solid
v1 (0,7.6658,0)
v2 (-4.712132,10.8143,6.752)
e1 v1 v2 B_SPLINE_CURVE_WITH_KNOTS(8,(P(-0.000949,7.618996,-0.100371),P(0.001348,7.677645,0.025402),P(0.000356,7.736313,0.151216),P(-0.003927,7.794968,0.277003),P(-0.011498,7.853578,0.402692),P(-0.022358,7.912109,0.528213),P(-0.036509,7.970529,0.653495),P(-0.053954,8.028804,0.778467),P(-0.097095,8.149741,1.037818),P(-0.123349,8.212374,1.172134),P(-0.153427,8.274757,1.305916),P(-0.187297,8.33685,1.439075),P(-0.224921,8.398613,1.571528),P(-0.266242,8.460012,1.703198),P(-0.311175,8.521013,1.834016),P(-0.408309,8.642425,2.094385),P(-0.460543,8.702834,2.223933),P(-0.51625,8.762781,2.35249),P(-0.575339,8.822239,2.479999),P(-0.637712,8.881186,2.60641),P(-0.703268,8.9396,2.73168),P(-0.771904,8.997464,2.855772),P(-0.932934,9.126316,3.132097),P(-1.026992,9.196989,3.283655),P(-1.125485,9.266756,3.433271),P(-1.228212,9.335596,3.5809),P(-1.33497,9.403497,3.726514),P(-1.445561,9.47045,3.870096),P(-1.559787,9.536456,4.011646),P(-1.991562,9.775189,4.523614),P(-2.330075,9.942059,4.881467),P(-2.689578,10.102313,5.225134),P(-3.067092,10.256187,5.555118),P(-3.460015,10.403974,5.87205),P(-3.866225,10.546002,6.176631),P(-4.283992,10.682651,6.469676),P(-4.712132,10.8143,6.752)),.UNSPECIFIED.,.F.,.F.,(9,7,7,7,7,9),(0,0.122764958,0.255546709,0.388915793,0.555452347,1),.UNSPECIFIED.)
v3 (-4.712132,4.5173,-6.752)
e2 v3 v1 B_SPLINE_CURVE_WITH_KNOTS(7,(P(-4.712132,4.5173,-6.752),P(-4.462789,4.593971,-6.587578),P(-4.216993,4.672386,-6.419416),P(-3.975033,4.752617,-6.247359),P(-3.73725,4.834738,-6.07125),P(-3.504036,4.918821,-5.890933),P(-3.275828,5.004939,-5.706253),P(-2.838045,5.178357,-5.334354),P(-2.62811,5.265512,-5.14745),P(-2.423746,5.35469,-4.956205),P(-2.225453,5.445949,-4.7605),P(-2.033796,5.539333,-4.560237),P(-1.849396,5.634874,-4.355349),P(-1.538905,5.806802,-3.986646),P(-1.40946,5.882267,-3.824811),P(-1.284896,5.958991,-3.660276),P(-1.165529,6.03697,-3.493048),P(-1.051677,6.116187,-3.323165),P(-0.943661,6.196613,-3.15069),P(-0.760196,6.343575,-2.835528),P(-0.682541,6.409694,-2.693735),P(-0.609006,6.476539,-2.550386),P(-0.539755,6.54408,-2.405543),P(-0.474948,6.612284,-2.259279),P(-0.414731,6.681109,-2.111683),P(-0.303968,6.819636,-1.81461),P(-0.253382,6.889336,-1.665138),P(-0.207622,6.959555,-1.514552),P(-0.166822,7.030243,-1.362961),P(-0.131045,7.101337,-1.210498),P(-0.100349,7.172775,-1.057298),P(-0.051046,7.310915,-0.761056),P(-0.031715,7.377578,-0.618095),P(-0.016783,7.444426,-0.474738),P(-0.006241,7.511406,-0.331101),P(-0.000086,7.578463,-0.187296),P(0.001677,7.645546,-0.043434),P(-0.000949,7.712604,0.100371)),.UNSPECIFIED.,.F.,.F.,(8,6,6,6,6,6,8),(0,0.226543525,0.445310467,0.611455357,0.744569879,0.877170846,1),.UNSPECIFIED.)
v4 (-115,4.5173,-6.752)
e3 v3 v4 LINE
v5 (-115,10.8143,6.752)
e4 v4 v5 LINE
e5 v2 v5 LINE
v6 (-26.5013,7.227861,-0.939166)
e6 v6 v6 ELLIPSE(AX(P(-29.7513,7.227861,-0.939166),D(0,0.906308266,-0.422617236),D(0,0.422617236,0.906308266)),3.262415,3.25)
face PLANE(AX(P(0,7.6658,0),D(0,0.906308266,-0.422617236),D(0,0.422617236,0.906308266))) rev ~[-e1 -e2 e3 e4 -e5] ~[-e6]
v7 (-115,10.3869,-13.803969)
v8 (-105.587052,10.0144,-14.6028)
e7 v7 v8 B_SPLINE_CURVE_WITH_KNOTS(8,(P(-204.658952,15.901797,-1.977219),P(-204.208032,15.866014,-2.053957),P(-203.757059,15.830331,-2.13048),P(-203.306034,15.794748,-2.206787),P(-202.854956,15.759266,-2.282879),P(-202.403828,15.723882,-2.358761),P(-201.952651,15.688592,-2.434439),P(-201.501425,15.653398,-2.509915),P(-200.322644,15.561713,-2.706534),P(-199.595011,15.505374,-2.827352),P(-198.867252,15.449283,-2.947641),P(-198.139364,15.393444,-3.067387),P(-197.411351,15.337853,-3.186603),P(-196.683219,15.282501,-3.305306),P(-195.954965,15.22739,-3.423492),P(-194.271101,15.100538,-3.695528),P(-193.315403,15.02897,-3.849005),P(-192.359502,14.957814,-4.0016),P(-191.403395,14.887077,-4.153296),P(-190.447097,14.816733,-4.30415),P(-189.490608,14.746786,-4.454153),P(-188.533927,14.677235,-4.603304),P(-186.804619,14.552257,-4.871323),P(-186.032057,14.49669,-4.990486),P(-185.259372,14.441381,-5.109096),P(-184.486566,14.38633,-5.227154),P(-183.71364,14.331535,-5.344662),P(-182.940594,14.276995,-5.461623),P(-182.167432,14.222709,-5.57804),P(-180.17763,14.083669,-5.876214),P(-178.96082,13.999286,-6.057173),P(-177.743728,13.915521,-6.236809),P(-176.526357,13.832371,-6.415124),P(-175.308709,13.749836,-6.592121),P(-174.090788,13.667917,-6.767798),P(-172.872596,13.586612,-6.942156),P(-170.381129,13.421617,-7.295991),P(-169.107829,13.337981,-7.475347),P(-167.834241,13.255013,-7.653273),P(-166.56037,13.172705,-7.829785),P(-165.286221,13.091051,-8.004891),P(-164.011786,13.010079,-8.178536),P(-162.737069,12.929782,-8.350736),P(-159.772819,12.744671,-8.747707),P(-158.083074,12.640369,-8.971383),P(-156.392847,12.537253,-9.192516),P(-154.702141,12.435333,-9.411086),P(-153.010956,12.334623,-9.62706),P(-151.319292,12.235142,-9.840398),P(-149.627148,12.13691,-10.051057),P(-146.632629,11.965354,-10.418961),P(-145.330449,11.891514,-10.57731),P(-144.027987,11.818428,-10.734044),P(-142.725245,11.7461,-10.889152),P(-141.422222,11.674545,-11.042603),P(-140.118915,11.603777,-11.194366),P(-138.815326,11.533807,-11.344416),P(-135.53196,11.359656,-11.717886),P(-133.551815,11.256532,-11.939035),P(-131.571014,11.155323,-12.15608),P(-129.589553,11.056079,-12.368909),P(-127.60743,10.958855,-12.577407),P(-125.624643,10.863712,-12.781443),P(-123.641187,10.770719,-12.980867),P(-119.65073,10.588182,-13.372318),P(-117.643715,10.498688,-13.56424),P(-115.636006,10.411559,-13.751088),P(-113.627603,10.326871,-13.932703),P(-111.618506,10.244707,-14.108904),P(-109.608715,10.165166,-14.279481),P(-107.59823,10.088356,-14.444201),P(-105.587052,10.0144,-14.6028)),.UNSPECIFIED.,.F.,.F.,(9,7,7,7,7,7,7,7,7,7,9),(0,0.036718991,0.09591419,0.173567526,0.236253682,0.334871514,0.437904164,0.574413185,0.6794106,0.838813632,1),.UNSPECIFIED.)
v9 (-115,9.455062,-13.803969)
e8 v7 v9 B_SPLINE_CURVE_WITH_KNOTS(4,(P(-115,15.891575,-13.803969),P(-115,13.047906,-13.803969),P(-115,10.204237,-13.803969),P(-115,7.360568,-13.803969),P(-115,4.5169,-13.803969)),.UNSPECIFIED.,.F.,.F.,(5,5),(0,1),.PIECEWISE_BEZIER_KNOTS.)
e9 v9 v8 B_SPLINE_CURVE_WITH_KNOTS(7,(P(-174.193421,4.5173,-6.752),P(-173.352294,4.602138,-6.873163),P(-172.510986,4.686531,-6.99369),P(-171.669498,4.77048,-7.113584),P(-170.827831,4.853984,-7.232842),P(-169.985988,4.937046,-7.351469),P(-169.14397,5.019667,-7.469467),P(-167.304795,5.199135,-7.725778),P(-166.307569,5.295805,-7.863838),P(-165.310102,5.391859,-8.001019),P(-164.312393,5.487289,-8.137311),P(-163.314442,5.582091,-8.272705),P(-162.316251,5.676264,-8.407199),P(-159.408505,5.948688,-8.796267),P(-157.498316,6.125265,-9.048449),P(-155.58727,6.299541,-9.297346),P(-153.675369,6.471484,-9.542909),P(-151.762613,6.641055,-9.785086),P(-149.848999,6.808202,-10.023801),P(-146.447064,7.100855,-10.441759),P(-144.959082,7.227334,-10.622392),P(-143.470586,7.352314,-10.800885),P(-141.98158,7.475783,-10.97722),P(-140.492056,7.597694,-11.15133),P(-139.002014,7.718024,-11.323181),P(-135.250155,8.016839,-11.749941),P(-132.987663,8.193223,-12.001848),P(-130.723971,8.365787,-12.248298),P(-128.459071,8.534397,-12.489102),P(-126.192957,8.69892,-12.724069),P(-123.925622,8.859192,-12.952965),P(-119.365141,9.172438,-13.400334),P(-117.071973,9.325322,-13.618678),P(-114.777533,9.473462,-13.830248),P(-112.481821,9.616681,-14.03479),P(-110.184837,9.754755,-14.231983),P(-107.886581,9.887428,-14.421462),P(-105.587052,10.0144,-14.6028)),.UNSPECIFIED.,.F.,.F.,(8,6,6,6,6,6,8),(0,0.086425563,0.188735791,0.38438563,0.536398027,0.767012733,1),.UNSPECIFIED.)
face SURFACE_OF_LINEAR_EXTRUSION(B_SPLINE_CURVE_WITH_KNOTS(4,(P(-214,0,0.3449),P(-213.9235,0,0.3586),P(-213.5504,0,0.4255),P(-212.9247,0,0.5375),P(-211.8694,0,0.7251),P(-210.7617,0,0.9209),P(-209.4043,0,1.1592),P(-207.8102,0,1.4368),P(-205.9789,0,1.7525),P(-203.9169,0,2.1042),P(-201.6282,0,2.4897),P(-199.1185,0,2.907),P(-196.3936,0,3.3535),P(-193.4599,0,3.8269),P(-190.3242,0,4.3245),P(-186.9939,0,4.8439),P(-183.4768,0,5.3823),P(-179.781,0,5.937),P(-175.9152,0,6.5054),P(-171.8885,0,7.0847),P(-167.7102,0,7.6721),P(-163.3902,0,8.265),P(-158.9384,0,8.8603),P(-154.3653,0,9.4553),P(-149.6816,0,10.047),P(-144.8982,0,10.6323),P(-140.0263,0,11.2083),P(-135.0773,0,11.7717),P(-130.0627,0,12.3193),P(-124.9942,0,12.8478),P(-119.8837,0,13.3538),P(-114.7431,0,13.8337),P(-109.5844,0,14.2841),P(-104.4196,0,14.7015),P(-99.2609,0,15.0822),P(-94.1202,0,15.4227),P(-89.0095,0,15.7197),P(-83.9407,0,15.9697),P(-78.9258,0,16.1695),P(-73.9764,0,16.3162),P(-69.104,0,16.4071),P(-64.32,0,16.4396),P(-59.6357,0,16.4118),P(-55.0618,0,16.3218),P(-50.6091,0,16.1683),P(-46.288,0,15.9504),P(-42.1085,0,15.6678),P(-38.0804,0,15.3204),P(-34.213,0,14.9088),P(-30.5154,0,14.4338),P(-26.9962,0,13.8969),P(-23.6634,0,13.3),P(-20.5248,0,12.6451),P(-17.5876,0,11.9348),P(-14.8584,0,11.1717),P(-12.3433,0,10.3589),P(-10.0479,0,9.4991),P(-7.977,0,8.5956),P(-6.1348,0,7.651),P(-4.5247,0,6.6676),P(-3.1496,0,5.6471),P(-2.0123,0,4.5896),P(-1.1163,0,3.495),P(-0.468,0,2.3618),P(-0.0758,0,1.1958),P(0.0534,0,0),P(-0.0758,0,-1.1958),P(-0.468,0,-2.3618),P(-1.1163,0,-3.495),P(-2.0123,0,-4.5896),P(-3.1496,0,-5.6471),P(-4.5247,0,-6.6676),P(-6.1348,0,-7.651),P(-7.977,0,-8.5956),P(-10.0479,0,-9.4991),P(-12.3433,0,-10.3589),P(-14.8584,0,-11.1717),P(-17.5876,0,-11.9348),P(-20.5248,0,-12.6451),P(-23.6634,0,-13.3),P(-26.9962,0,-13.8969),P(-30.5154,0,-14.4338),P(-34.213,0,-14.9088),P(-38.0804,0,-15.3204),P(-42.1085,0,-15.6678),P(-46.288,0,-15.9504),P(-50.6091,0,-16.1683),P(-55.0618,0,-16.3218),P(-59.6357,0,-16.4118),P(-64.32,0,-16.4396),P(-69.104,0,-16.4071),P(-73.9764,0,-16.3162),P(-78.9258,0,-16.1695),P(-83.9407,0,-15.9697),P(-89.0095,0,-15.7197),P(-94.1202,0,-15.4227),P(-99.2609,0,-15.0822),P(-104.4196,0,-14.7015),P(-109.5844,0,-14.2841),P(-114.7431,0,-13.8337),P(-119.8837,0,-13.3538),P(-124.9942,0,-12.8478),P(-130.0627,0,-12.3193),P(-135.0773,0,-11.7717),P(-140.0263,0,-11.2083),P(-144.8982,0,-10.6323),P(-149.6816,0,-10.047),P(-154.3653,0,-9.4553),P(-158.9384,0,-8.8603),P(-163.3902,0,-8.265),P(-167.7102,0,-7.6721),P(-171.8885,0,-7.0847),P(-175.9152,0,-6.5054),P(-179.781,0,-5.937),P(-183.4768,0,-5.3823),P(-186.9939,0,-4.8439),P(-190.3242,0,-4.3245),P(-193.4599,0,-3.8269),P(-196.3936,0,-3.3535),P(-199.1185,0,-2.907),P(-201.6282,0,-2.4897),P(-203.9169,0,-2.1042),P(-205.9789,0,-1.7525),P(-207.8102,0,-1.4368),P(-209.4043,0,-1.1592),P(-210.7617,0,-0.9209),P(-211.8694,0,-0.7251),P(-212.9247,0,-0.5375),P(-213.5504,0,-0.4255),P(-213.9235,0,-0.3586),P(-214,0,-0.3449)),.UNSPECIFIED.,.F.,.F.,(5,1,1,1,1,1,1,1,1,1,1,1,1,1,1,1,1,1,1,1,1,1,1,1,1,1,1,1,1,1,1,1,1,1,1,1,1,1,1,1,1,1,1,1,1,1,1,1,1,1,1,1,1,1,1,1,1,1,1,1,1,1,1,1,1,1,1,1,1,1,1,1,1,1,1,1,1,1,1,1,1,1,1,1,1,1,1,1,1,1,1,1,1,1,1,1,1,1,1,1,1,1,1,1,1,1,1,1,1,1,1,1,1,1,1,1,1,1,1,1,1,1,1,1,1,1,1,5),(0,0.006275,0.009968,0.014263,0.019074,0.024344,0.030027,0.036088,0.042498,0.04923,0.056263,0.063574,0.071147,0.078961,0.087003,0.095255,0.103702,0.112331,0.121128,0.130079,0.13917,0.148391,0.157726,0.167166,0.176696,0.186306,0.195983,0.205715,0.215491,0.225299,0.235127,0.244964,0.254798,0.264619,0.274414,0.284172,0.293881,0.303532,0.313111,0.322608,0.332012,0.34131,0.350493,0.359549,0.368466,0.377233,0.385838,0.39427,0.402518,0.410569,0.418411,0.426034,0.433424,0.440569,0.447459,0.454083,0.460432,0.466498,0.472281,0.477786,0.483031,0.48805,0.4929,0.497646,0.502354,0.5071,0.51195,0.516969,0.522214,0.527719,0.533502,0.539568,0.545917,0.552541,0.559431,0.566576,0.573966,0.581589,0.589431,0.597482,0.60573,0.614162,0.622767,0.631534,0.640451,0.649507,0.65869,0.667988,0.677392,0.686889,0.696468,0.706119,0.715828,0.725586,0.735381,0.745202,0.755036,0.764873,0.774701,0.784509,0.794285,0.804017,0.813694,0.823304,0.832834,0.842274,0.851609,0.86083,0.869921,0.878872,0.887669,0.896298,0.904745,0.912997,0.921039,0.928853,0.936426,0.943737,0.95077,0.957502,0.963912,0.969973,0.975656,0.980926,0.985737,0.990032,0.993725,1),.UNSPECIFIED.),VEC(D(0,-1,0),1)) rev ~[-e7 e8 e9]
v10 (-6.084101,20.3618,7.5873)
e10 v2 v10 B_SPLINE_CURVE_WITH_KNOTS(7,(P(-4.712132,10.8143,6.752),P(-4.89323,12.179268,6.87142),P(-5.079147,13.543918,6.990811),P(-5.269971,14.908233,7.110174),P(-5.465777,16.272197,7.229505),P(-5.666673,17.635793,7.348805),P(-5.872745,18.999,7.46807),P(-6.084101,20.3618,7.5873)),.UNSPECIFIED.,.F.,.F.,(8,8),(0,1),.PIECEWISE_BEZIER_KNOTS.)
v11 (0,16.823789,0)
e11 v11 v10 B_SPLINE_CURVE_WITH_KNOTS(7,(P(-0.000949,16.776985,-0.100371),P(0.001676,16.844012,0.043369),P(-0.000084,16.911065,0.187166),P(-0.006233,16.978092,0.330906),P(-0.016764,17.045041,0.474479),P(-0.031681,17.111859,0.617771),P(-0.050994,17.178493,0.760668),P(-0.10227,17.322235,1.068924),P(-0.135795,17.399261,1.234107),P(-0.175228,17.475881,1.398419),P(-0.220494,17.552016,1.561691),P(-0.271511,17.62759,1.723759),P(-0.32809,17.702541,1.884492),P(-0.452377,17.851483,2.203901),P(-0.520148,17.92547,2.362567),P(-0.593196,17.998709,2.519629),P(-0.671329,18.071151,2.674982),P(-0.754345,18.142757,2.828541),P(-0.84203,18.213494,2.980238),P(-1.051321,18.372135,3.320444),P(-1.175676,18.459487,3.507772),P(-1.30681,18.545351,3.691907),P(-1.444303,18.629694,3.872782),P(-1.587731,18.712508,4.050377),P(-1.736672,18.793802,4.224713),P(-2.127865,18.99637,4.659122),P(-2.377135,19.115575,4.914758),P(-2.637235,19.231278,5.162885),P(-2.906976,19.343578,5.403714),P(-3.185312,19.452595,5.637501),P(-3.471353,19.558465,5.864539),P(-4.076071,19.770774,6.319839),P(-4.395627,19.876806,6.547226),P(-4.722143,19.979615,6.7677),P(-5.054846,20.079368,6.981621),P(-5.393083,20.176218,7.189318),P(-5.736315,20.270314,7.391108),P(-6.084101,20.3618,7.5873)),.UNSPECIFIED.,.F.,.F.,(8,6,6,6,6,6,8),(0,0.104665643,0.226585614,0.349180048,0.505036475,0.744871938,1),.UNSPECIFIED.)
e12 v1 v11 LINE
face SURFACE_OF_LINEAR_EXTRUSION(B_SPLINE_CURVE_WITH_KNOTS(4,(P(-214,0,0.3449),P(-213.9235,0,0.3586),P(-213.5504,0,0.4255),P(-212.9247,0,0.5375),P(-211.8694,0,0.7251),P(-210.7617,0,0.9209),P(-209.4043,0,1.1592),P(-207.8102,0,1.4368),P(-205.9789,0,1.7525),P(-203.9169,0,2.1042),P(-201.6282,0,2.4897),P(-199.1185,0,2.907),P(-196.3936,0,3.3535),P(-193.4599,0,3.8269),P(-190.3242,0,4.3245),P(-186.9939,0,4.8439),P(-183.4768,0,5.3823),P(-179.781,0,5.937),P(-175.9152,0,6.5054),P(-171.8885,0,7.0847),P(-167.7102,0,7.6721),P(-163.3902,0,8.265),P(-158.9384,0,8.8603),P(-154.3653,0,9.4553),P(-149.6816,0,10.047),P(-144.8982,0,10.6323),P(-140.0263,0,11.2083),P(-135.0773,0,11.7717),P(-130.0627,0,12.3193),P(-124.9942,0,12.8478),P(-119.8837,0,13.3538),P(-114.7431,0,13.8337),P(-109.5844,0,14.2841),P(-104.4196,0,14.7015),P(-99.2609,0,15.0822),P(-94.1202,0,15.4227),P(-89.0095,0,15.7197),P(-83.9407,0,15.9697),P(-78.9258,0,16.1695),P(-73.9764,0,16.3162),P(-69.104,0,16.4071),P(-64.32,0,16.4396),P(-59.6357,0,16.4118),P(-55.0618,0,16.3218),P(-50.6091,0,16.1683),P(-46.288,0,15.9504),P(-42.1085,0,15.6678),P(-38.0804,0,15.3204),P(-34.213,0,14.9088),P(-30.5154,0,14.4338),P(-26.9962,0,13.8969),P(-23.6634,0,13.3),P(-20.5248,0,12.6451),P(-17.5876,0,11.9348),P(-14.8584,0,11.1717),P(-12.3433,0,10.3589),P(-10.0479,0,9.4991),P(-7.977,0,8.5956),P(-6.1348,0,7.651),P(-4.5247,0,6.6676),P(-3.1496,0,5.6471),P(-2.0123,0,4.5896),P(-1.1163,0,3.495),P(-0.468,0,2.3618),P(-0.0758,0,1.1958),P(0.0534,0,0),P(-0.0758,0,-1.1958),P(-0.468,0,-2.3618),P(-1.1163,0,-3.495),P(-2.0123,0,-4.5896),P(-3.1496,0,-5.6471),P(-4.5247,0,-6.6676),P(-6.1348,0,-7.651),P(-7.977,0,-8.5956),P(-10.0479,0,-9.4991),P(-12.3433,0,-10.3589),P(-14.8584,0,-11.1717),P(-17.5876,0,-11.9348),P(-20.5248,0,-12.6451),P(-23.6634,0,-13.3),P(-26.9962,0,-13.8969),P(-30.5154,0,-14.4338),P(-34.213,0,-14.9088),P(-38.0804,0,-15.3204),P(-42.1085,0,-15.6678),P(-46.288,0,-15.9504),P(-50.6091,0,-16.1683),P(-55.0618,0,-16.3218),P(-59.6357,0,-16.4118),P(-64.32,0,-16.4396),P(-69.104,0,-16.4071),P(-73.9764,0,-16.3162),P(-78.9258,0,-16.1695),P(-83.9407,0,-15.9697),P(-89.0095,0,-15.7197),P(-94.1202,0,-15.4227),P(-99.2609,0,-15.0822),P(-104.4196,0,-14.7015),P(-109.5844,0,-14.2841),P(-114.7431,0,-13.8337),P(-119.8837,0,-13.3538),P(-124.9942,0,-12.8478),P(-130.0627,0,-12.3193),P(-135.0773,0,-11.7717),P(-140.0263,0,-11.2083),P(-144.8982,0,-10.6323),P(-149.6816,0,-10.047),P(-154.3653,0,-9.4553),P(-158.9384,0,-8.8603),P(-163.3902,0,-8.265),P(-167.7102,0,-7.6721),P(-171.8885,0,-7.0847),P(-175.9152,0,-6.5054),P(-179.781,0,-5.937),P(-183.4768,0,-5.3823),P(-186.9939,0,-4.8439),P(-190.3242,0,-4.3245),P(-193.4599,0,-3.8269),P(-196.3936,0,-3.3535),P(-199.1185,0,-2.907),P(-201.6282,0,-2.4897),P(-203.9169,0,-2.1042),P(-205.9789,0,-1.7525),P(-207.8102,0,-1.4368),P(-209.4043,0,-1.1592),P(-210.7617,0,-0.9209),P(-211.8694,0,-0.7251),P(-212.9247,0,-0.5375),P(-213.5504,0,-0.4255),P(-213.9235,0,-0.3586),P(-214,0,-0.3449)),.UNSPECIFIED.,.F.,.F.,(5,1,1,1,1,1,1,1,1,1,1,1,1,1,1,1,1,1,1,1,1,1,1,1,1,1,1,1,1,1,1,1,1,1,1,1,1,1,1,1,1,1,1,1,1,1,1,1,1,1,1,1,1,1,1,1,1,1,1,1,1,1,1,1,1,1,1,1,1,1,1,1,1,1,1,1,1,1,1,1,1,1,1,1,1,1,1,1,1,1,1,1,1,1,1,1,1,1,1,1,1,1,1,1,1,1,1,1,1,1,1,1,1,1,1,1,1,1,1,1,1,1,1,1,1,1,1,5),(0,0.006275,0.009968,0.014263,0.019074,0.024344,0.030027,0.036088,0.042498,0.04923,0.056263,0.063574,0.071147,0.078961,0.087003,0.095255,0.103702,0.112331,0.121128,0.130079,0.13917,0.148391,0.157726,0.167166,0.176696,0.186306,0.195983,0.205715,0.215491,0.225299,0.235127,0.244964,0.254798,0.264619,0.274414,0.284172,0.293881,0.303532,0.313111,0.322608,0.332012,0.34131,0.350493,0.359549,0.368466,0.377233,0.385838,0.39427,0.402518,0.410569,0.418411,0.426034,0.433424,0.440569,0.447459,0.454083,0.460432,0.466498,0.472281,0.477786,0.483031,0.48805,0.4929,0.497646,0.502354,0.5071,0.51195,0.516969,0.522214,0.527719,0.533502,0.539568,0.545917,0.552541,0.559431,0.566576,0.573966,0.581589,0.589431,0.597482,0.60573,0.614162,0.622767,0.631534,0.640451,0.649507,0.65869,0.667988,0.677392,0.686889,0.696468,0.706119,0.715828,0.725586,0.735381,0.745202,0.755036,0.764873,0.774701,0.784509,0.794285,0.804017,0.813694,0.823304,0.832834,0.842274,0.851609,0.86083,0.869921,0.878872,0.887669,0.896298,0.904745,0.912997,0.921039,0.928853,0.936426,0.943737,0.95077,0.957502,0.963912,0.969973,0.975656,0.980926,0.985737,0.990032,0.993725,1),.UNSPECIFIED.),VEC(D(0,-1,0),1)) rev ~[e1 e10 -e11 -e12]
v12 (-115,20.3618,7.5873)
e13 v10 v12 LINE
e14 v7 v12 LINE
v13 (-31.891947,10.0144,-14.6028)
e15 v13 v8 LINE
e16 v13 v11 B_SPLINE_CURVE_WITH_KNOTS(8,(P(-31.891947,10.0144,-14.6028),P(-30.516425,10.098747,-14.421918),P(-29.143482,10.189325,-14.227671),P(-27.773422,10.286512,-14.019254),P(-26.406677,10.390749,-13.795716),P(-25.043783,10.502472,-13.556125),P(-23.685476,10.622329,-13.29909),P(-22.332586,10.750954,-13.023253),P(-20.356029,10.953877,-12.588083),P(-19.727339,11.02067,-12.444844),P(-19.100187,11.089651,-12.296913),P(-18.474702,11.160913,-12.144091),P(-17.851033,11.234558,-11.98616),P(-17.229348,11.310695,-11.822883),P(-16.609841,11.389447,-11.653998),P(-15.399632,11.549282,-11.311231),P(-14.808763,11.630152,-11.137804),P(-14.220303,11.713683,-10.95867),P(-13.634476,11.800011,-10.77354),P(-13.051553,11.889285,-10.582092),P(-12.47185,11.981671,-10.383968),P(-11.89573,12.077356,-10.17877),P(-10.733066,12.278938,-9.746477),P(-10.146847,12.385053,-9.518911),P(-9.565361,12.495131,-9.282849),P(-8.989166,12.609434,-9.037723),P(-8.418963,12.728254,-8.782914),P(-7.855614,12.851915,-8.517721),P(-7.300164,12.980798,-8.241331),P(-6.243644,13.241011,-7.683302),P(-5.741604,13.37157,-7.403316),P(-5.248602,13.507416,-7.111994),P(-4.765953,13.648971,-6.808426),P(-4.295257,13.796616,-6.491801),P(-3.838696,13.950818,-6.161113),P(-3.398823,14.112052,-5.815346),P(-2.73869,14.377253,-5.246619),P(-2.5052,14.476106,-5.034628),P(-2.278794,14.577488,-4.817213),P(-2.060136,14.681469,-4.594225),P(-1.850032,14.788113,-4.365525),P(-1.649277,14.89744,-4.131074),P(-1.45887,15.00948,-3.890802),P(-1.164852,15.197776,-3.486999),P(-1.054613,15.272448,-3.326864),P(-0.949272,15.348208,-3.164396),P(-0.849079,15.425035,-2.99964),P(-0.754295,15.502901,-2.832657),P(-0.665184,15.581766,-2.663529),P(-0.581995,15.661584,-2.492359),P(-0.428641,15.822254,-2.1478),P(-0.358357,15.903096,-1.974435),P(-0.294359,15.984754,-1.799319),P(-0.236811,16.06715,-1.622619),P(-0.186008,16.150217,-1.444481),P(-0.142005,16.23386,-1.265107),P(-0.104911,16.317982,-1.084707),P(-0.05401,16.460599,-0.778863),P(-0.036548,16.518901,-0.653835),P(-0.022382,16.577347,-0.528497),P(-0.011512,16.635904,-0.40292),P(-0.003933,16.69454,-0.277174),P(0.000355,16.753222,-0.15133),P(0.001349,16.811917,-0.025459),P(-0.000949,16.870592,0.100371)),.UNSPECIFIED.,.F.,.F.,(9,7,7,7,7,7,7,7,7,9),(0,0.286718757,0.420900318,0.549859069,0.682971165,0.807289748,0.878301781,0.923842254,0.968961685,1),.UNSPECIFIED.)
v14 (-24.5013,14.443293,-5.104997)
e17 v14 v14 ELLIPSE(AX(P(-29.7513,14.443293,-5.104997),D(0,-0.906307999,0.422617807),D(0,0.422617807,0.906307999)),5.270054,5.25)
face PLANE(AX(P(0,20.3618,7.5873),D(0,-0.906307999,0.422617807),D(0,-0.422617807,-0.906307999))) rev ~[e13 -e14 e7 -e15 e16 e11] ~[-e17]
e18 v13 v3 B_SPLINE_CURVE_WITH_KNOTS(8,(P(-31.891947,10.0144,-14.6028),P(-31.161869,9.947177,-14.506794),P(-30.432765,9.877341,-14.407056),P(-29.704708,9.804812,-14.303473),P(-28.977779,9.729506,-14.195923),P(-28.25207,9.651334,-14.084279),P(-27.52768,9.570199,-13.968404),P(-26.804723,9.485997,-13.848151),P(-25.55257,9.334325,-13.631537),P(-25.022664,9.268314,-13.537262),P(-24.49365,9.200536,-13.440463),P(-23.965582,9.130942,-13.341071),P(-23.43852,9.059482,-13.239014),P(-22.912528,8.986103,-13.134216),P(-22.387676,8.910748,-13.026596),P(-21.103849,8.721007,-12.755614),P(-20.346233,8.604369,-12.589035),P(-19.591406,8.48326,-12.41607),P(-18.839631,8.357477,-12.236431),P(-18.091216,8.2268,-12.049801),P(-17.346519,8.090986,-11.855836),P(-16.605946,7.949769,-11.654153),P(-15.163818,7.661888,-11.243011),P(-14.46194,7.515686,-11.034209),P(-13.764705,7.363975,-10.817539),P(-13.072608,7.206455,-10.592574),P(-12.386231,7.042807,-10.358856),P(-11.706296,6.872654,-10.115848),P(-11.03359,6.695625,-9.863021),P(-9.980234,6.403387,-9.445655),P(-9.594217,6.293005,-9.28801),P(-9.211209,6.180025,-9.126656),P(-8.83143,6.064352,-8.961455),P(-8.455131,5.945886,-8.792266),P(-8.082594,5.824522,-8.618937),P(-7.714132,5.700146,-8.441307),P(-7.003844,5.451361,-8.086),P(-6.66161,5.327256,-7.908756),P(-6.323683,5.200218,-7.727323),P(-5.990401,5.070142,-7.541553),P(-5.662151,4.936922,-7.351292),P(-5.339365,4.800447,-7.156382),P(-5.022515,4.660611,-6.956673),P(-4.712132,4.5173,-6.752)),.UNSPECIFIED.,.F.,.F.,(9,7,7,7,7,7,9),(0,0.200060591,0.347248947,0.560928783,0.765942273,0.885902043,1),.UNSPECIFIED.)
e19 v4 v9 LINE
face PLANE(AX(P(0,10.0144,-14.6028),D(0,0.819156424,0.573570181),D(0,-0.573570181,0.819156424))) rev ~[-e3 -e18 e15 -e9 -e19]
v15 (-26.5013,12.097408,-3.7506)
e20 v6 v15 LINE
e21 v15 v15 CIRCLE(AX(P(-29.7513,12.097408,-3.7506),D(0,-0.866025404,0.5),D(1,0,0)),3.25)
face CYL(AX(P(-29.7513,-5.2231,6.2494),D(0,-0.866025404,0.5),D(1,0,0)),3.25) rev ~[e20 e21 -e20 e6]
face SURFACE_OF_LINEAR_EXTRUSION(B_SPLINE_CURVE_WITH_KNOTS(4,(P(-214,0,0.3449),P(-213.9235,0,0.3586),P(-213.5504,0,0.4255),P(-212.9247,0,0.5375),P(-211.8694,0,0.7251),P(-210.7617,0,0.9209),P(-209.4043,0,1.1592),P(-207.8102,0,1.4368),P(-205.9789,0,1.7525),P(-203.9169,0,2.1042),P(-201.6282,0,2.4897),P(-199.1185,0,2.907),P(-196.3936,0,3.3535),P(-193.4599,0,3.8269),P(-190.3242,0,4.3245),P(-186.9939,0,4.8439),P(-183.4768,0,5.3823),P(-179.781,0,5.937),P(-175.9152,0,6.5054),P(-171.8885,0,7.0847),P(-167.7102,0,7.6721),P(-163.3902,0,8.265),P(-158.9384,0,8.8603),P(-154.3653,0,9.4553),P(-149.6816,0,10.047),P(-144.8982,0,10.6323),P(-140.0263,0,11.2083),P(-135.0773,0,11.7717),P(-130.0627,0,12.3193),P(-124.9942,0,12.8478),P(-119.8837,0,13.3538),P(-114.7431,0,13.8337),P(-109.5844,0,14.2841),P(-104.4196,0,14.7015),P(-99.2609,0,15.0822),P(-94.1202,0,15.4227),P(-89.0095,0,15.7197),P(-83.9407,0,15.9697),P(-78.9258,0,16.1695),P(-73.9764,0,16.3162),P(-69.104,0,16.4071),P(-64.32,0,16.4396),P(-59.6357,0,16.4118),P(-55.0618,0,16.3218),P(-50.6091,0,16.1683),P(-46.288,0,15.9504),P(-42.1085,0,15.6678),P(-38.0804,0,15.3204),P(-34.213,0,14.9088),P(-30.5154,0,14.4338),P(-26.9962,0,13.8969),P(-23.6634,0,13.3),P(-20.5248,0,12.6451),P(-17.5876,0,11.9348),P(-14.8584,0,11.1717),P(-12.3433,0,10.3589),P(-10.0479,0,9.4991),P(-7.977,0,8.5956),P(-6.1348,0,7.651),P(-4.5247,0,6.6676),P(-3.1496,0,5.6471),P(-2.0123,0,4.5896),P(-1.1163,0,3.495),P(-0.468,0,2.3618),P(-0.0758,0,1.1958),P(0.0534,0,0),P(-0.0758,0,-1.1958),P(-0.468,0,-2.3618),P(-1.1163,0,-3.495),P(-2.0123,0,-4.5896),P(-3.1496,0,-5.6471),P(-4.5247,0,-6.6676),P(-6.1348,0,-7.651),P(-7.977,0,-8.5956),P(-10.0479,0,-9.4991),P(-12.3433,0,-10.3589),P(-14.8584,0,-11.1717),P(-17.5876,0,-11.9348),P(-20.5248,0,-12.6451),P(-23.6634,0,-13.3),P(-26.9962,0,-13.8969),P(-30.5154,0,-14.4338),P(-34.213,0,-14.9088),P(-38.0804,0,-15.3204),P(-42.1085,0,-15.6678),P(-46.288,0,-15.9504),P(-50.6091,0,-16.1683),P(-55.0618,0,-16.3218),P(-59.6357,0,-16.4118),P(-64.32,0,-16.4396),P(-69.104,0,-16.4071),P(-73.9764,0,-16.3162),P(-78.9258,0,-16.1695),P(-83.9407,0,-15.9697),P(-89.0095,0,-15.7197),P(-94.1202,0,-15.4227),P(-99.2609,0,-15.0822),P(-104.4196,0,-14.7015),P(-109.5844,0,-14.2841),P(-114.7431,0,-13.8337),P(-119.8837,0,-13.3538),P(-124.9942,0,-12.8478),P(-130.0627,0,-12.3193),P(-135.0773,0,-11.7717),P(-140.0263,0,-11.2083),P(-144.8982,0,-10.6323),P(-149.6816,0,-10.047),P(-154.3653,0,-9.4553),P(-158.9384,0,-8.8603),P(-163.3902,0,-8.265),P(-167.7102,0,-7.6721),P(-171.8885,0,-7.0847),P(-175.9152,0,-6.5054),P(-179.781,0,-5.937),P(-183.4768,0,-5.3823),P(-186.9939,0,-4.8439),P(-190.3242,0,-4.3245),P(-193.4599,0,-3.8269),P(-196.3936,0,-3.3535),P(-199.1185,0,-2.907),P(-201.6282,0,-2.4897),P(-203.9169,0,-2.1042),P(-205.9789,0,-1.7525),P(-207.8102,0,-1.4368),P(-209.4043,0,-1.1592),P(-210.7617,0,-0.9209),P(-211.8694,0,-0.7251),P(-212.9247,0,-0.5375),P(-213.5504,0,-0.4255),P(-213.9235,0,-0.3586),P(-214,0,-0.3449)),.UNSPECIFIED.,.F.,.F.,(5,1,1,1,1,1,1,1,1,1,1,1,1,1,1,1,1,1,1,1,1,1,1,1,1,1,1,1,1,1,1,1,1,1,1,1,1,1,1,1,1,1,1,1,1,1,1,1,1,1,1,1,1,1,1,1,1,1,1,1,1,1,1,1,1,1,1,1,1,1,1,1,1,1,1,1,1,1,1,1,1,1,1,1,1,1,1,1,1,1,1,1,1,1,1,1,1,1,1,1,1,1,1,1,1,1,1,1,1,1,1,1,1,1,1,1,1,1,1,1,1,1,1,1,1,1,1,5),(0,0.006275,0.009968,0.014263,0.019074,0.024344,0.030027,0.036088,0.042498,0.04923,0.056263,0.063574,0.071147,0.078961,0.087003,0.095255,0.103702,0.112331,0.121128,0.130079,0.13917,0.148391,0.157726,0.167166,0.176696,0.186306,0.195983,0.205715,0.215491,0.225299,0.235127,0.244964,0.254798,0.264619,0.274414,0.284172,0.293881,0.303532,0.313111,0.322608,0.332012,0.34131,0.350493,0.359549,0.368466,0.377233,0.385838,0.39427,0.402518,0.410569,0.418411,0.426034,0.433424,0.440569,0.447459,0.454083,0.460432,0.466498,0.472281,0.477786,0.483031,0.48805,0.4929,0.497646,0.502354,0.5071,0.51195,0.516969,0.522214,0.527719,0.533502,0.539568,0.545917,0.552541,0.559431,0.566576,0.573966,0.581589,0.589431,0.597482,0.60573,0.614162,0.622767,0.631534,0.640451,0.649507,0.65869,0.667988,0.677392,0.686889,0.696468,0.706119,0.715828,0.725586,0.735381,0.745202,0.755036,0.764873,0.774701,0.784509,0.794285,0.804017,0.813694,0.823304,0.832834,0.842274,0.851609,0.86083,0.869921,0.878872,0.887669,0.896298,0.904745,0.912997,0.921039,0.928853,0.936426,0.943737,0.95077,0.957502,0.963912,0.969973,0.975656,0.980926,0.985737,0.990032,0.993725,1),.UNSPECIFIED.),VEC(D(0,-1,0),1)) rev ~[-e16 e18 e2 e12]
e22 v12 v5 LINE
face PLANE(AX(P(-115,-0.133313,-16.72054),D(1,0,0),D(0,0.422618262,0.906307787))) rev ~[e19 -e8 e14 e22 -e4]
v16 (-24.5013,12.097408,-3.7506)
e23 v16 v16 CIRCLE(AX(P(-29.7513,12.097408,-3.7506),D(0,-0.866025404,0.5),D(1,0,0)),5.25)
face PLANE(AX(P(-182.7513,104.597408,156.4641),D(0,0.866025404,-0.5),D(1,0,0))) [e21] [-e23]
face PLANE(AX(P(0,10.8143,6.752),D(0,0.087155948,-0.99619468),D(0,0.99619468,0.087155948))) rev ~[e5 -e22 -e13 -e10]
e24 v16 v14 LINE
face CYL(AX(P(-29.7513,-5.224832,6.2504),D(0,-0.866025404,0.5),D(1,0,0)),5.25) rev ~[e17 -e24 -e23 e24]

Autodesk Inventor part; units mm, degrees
sketch "Sketch5" plane through (0, 0, 0) normal (0, 1, 0) x (-1, 0, 0)
  spline S0 degree 4 poles (214, 0.3449) (213.9235, 0.3586) (213.5504, 0.4255) (212.9247, 0.5375) (211.8694, 0.7251) (210.7617, 0.9209) (209.4043, 1.1592) (207.8102, 1.4368) (205.9789, 1.7525) (203.9169, 2.1042) (201.6282, 2.4897) (199.1185, 2.907) (196.3936, 3.3535) (193.4599, 3.8269) (190.3242, 4.3245) (186.9939, 4.8439) (183.4768, 5.3823) (179.781, 5.937) (175.9152, 6.5054) (171.8885, 7.0847) (167.7102, 7.6721) (163.3902, 8.265) (158.9384, 8.8603) (154.3653, 9.4553) (149.6816, 10.047) (144.8982, 10.6323) (140.0263, 11.2083) (135.0773, 11.7717) (130.0627, 12.3193) (124.9942, 12.8478) (119.8837, 13.3538) (114.7431, 13.8337) (109.5844, 14.2841) (104.4196, 14.7015) (99.2609, 15.0822) (94.1202, 15.4227) (89.0095, 15.7197) (83.9407, 15.9697) (78.9258, 16.1695) (73.9764, 16.3162) (69.104, 16.4071) (64.32, 16.4396) (59.6357, 16.4118) (55.0618, 16.3218) (50.6091, 16.1683) (46.288, 15.9504) (42.1085, 15.6678) (38.0804, 15.3204) (34.213, 14.9088) (30.5154, 14.4338) (26.9962, 13.8969) (23.6634, 13.3) (20.5248, 12.6451) (17.5876, 11.9348) (14.8584, 11.1717) (12.3433, 10.3589) (10.0479, 9.4991) (7.977, 8.5956) (6.1348, 7.651) (4.5247, 6.6676) (3.1496, 5.6471) (2.0123, 4.5896) (1.1163, 3.495) (0.468, 2.3618) (0.0758, 1.1958) (-0.0534, 0) (0.0758, -1.1958) (0.468, -2.3618) (1.1163, -3.495) (2.0123, -4.5896) (3.1496, -5.6471) (4.5247, -6.6676) (6.1348, -7.651) (7.977, -8.5956) (10.0479, -9.4991) (12.3433, -10.3589) (14.8584, -11.1717) (17.5876, -11.9348) (20.5248, -12.6451) (23.6634, -13.3) (26.9962, -13.8969) (30.5154, -14.4338) (34.213, -14.9088) (38.0804, -15.3204) (42.1085, -15.6678) (46.288, -15.9504) (50.6091, -16.1683) (55.0618, -16.3218) (59.6357, -16.4118) (64.32, -16.4396) (69.104, -16.4071) (73.9764, -16.3162) (78.9258, -16.1695) (83.9407, -15.9697) (89.0095, -15.7197) (94.1202, -15.4227) (99.2609, -15.0822) (104.4196, -14.7015) (109.5844, -14.2841) (114.7431, -13.8337) (119.8837, -13.3538) (124.9942, -12.8478) (130.0627, -12.3193) (135.0773, -11.7717) (140.0263, -11.2083) (144.8982, -10.6323) (149.6816, -10.047) (154.3653, -9.4553) (158.9384, -8.8603) (163.3902, -8.265) (167.7102, -7.6721) (171.8885, -7.0847) (175.9152, -6.5054) (179.781, -5.937) (183.4768, -5.3823) (186.9939, -4.8439) (190.3242, -4.3245) (193.4599, -3.8269) (196.3936, -3.3535) (199.1185, -2.907) (201.6282, -2.4897) (203.9169, -2.1042) (205.9789, -1.7525) (207.8102, -1.4368) (209.4043, -1.1592) (210.7617, -0.9209) (211.8694, -0.7251) (212.9247, -0.5375) (213.5504, -0.4255) (213.9235, -0.3586) (214, -0.3449) knots 0 0 0 0 0 0.006275 0.009968 0.014263 0.019074 0.024344 0.030027 0.036088 0.042498 0.04923 0.056263 0.063574 0.071147 0.078961 0.087003 0.095255 0.103702 0.112331 0.121128 0.130079 0.13917 0.148391 0.157726 0.167166 0.176696 0.186306 0.195983 0.205715 0.215491 0.225299 0.235127 0.244964 0.254798 0.264619 0.274414 0.284172 0.293881 0.303532 0.313111 0.322608 0.332012 0.34131 0.350493 0.359549 0.368466 0.377233 0.385838 0.39427 0.402518 0.410569 0.418411 0.426034 0.433424 0.440569 0.447459 0.454083 0.460432 0.466498 0.472281 0.477786 0.483031 0.48805 0.4929 0.497646 0.502354 0.5071 0.51195 0.516969 0.522214 0.527719 0.533502 0.539568 0.545917 0.552541 0.559431 0.566576 0.573966 0.581589 0.589431 0.597482 0.60573 0.614162 0.622767 0.631534 0.640451 0.649507 0.65869 0.667988 0.677392 0.686889 0.696468 0.706119 0.715828 0.725586 0.735381 0.745202 0.755036 0.764873 0.774701 0.784509 0.794285 0.804017 0.813694 0.823304 0.832834 0.842274 0.851609 0.86083 0.869921 0.878872 0.887669 0.896298 0.904745 0.912997 0.921039 0.928853 0.936426 0.943737 0.95077 0.957502 0.963912 0.969973 0.975656 0.980926 0.985737 0.990032 0.993725 1 1 1 1 1
  line L0 (204.525, -2) -> (204.525, 2)
  line L1 (204.525, 0) -> (0, 0)
  line L2 (0, 0) -> (61.2, 0)
  line L3 (61.2, 0) -> (61.2, -16.415)
  line L4 (61.2, -16.415) -> (61.2, 16.415)
  point P0 (0, 0)
  point P1 (213.875, 0.3673)
  point P2 (213.5005, 0.4344)
  point P3 (212.8772, 0.5457)
  point P4 (212.0066, 0.7006)
  point P5 (210.8908, 0.8979)
  point P6 (209.5323, 1.1364)
  point P7 (207.9344, 1.4146)
  point P8 (206.1007, 1.7309)
  point P9 (204.0356, 2.0831)
  point P10 (201.7438, 2.4693)
  point P11 (199.2308, 2.8872)
  point P12 (196.5023, 3.3344)
  point P13 (193.5648, 3.8084)
  point P14 (190.4252, 4.3068)
  point P15 (187.0907, 4.8269)
  point P16 (183.5691, 5.366)
  point P17 (179.8687, 5.9215)
  point P18 (175.9981, 6.4907)
  point P19 (171.9664, 7.0708)
  point P20 (167.7829, 7.6591)
  point P21 (163.4575, 8.2526)
  point P22 (159.0002, 8.8488)
  point P23 (154.4215, 9.4444)
  point P24 (149.732, 10.0368)
  point P25 (144.9427, 10.6228)
  point P26 (140.0648, 11.1993)
  point P27 (135.1097, 11.7633)
  point P28 (130.0889, 12.3114)
  point P29 (125.0142, 12.8402)
  point P30 (119.8974, 13.3464)
  point P31 (114.7505, 13.8266)
  point P32 (109.5855, 14.2771)
  point P33 (104.4145, 14.6943)
  point P34 (99.2495, 15.0749)
  point P35 (94.1026, 15.4151)
  point P36 (88.9858, 15.7116)
  point P37 (83.9111, 15.961)
  point P38 (78.8903, 16.1601)
  point P39 (73.9352, 16.306)
  point P40 (69.0573, 16.3958)
  point P41 (64.268, 16.4271)
  point P42 (59.5785, 16.3978)
  point P43 (54.9998, 16.3062)
  point P44 (50.5425, 16.1509)
  point P45 (46.2171, 15.931)
  point P46 (42.0336, 15.6461)
  point P47 (38.0019, 15.2962)
  point P48 (34.1313, 14.8818)
  point P49 (30.4309, 14.4038)
  point P50 (26.9093, 13.8636)
  point P51 (23.5748, 13.2629)
  point P52 (20.4352, 12.6039)
  point P53 (17.4977, 11.889)
  point P54 (14.7693, 11.1209)
  point P55 (12.2562, 10.3027)
  point P56 (9.9644, 9.4372)
  point P57 (7.8993, 8.5276)
  point P58 (6.0656, 7.5769)
  point P59 (4.4677, 6.5883)
  point P60 (3.1092, 5.5644)
  point P61 (1.9934, 4.5081)
  point P62 (1.1228, 3.4216)
  point P63 (0.4995, 2.307)
  point P64 (0.125, 1.1661)
  point P65 (0.125, -1.1661)
  point P66 (0.4995, -2.307)
  point P67 (1.1228, -3.4216)
  point P68 (1.9934, -4.5081)
  point P69 (3.1092, -5.5644)
  point P70 (4.4677, -6.5883)
  point P71 (6.0656, -7.5769)
  point P72 (7.8993, -8.5276)
  point P73 (9.9644, -9.4372)
  point P74 (12.2562, -10.3027)
  point P75 (14.7693, -11.1209)
  point P76 (17.4977, -11.889)
  point P77 (20.4352, -12.6039)
  point P78 (23.5748, -13.2629)
  point P79 (26.9093, -13.8636)
  point P80 (30.4309, -14.4038)
  point P81 (34.1313, -14.8818)
  point P82 (38.0019, -15.2962)
  point P83 (42.0336, -15.6461)
  point P84 (46.2171, -15.931)
  point P85 (50.5425, -16.1509)
  point P86 (54.9998, -16.3062)
  point P87 (59.5785, -16.3978)
  point P88 (64.268, -16.4271)
  point P89 (69.0573, -16.3958)
  point P90 (73.9352, -16.306)
  point P91 (78.8903, -16.1601)
  point P92 (83.9111, -15.961)
  point P93 (88.9858, -15.7116)
  point P94 (94.1026, -15.4151)
  point P95 (99.2495, -15.0749)
  point P96 (104.4145, -14.6943)
  point P97 (109.5855, -14.2771)
  point P98 (114.7505, -13.8266)
  point P99 (119.8974, -13.3464)
  point P100 (125.0142, -12.8402)
  point P101 (130.0889, -12.3114)
  point P102 (135.1097, -11.7633)
  point P103 (140.0648, -11.1993)
  point P104 (144.9427, -10.6228)
  point P105 (149.732, -10.0368)
  point P106 (154.4215, -9.4444)
  point P107 (159.0002, -8.8488)
  point P108 (163.4575, -8.2526)
  point P109 (167.7829, -7.6591)
  point P110 (171.9664, -7.0708)
  point P111 (175.9981, -6.4907)
  point P112 (179.8687, -5.9215)
  point P113 (183.5691, -5.366)
  point P114 (187.0907, -4.8269)
  point P115 (190.4252, -4.3068)
  point P116 (193.5648, -3.8084)
  point P117 (196.5023, -3.3344)
  point P118 (199.2308, -2.8872)
  point P119 (201.7438, -2.4693)
  point P120 (204.0356, -2.0831)
  point P121 (206.1007, -1.7309)
  point P122 (207.9344, -1.4146)
  point P123 (209.5323, -1.1364)
  point P124 (210.8908, -0.8979)
  point P125 (212.0066, -0.7006)
  point P126 (212.8772, -0.5457)
  point P127 (213.5005, -0.4344)
  point P128 (213.875, -0.3673)
  dimension "d28" = 204.525
  dimension "d29" = 61.2
  dimension "d30" = 32.8299
extrude "Main Wing" add sketch "Sketch5" along normal blind 453.491
sketch "Sketch6" plane through (-204.525, 0, 2) normal (-1, 0, 0) x (0, 0, 1)
  line L0 (0, 0) -> (0, 66.548)
  line L1 (0, 453.4889) -> (0, 366.5701)
  line L2 (20, 366.5701) -> (-20, 366.5701)
  line L3 (-20, 66.548) -> (20, 66.548)
  line L4 (20, 66.548) -> (20, 366.5701)
  line L5 (-20, 366.5701) -> (-20, 66.548)
  point P0 (-2, 0)
  dimension "d31" = 66.548
  dimension "d32" = 86.9188
  dimension "d33" = 40
  dimension "d34" = 40
  dimension "d43" = 300.0221
extrude "Rectangle Elevron Gap" cut sketch "Sketch6" against normal blind 69.6214
sketch "Sketch7" plane through (-204.525, 66.548, 2) normal (0, 1, 0) x (1, 0, 0)
  line L0 (69.6201, 13.7865) -> (69.6201, -9.7851)
  line L1 (69.6201, -9.7851) -> (69.6201, 2.0009)
  circle A0 centre (69.6201, 2.0009) radius 17
  circle A1 centre (69.6201, 2.0009) radius 1.7526
  point P0 (204.525, 2)
  point P1 (69.6201, 3.7535)
  point P2 (69.6201, 0.2483)
  dimension "d37" = 23.5717
  dimension "d38" = 11.786
  dimension "d41" = 34
  dimension "d42" = 3.5052
extrude "Circle Elevron Gap" cut sketch "Sketch7" along normal blind 300.0221 contours A1 L0 | A0 picked at (69.7501, 0.8471)
sketch "Sketch8" plane through (0, 453.491, 0) normal (0, 1, 0) x (1, 0, 0)
  line L0 (-204.5238, 0) -> (-143.0304, 0)
  circle A0 centre (-143.0304, 0) radius 1.7526
  point P0 (0, 0)
  dimension "d46" = 61.4934
  dimension "d47" = 3.5052
extrude "Elevron Screw Hole" cut sketch "Sketch8" against normal blind 454.0221
ref_plane "Leading Edge Plane" through (0, 226.7455, 0) normal (-1, 0, 0) x (0, 0, 1)
sketch "Sketch9" plane through (0, 226.7455, 0) normal (-1, 0, 0) x (0, 0, 1)
  line L0 (0, -226.7455) -> (0, 226.7401)
  line L1 (0, 226.7401) -> (0, 213.1781)
  line L2 (0, 213.1781) -> (0, 194.4281)
  circle A0 centre (0, 194.4281) radius 18.75
  line L3 (-14.0018, 198.1799) -> (3.7518, 208.4299)
  line L4 (3.7518, 208.4299) -> (14.0018, 190.6764)
  line L5 (14.0018, 190.6764) -> (-3.7518, 180.4264)
  line L6 (-3.7518, 180.4264) -> (-14.0018, 198.1799)
  line L7 (-14.0018, 198.1799) -> (14.0018, 190.6764) construction
  line L8 (3.7518, 208.4299) -> (-3.7518, 180.4264) construction
  circle A1 centre (0, 194.4281) radius 15.5
  dimension "d50" = 13.562
  dimension "d51" = 18.75
  dimension "d52" = 37.5
  dimension "d55" = 20.5
  dimension "d56" = 20.5
  dimension "d70" = 31
extrude "Circle thingy for boom" add sketch "Sketch9" along normal blind 204.5 contours A1 L0 L3 L6 L5 | L0 L5 L4 L3 A1 | L5 L6 L3 L0 | L0 L3 L4 L5
sketch "Sketch10" plane through (0, 226.7455, 0) normal (1, 0, 0) x (0, 0, -1)
  line L0 (0, 213.1791) -> (0, 194.4291)
  line L1 (13.6215, 199.3869) -> (-4.9578, 208.0506)
  line L2 (-4.9578, 208.0506) -> (-13.6215, 189.4713)
  line L3 (-13.6215, 189.4713) -> (4.9578, 180.8076)
  line L4 (4.9578, 180.8076) -> (13.6215, 199.3869)
  line L5 (13.6215, 199.3869) -> (-13.6215, 189.4713) construction
  line L6 (-4.9578, 208.0506) -> (4.9578, 180.8076) construction
  point P0 (0, -226.7455)
  dimension "d57" = 18.75
  dimension "d58" = 20.5
  dimension "d59" = 20.5
extrude "20x20 hole for boom" cut sketch "Sketch10" against normal blind 205.5
ref_plane "Plane of Pain" through (-204.525, 0, -17) normal (0, 0, 1) x (0, 1, 0)
ref_plane "Work Plane5" through (-204.525, 0, -2) normal (0, 0, 1) x (0, 1, 0)
sketch "Sketch11" plane through (-204.525, 0, -17) normal (0, 0, 1) x (0, 1, 0)
  line L0 (453.4842, 0.0013) -> (403.4842, 0.0013)
  line L1 (403.4842, 0.0013) -> (404.7122, -149.9936)
  circle A0 centre (404.7122, -149.9936) radius 5.25
  line L2 (404.7122, -149.9936) -> (219.7122, -149.9936)
  circle A1 centre (219.7122, -149.9936) radius 5.25
  line L3 (366.5707, -80.63) -> (219.7122, -80.63)
  line L4 (219.7122, -80.63) -> (219.7122, -149.9936)
  point P0 (0, -204.525)
  dimension "d64" = 50
  dimension "d65" = 150
  dimension "d66" = 10.5
  dimension "d67" = 185
  dimension "d121" = 146.8585
  dimension "d122" = 69.3637
ref_plane "20x20 Plane" through (0, 416.8428, -9.2897) normal (0, 0.4226183, 0.9063078) x (1, 0, 0)
sketch "Sketch12" plane through (0, 416.8428, -9.2897) normal (0, 0.4226183, 0.9063078) x (1, 0, 0)
  line L0 (0, 10.2503) -> (0, 0.0003)
  line L1 (0, 0.0003) -> (-55, 0.0003)
  circle A0 centre (-55, 0.0003) radius 5.25
  circle A1 centre (-55, 0.0003) radius 2.75
  point P0 (0, -381.7138)
  dimension "d71" = 10.25
  dimension "d72" = 55
  dimension "d73" = 10.5
  dimension "d74" = 5.5
sketch "Sketch13" plane through (0, 416.8428, -9.2897) normal (0, 0.4226183, 0.9063078) x (1, 0, 0)
  circle A0 centre (-55, 0) radius 5.25
  circle A1 centre (-55, 0) radius 2.75
  point P0 (0, -381.7138)
  dimension "d77" = 10.5
  dimension "d82" = 5.5
extrude "Boom Screw Head" cut sketch "Sketch13" against normal blind 13.75 contours A0 | A1
extrude "Boom Screw Hole" add sketch "Sketch12" against normal blind 3
sketch "Sketch14" plane through (-204.525, 366.5701, -2) normal (0, -1, 0) x (1, 0, 0)
  line L0 (61.5404, 3.7631) -> (61.5404, 7.2141)
  line L1 (61.5404, 7.2141) -> (43.5474, 7.2141)
  line L2 (61.5404, 7.2141) -> (69.3184, 7.2141)
  line L3 (43.5474, 7.2141) -> (43.5474, -10.2859)
  line L4 (69.3184, 7.2141) -> (69.3184, -10.2859)
  line L5 (43.5474, -10.2859) -> (69.3184, -10.2859)
  point P0 (204.525, 2)
  dimension "d89" = 3.451
  dimension "d90" = 17.993
  dimension "d91" = 7.778
  dimension "d93" = 17.5
  dimension "d94" = 17.5
extrude "Servo Hole" cut sketch "Sketch14" against normal blind 28.763
sketch "Sketch15" plane through (-135.2066, 366.5701, -11.7525) normal (-1, 0, 0) x (0, 0, 1)
  line L0 (17, 0) -> (17, 6)
  line L1 (17, 6) -> (17, 8)
  line L2 (17, 8) -> (-3, 8)
  line L3 (-3, 8) -> (-3, 6)
  line L4 (-3, 6) -> (17, 6)
  point P0 (11.7525, -366.5701)
  dimension "d97" = 6
  dimension "d98" = 2
  dimension "d99" = 2
extrude "Servo Sidewall 1" cut sketch "Sketch15" against normal blind 2.782
sketch "Sketch16" plane through (-160.9776, 366.5701, 5.2141) normal (1, 0, 0) x (0, 0, -1)
  line L0 (0, 0) -> (0, 6)
  line L1 (0, 6) -> (0, 8)
  line L2 (0, 8) -> (14, 8)
  line L3 (14, 8) -> (14, 6)
  line L4 (14, 6) -> (0, 6)
  point P0 (5.2141, -366.5701)
  dimension "d102" = 6
  dimension "d103" = 2
extrude "Servo Sidewall 2" cut sketch "Sketch16" against normal blind 2.782
sketch "Sketch17" plane through (-135.2066, 366.5701, 5.2141) normal (0, 0, -1) x (-1, 0, 0)
  line L0 (0, 8) -> (0, 16.3)
  line L1 (0, 28.7478) -> (0, 23.2698)
  line L2 (0, 16.3) -> (-27.1565, 48.6638)
  line L3 (0, 23.2698) -> (-27.1565, 55.6336)
  line L4 (-27.1565, 48.6638) -> (-27.1565, 55.6336)
  line L5 (0, 23.2698) -> (0, 16.3)
  point P0 (-135.2066, -366.5701)
  point P1 (0, 23.2698)
  dimension "d106" = 8.3
  dimension "d107" = 5.478
  dimension "d108" = 42.248
  dimension "d109" = 42.248
extrude "some slant hole" cut sketch "Sketch17" along normal blind 23.75
fillet "Fillet for slant" radius 7.7 2 edges at (-135.2066, 382.8701, -3.2692) (-135.2066, 389.8399, -3.2692)
sketch "Sketch18" plane through (-204.525, 0, -17) normal (0, 0, 1) x (0, 1, 0)
  circle A0 centre (219.7124, -149.9979) radius 3.25
  point P0 (0, -204.525)
  dimension "d113" = 6.5
extrude "Screwhead for something" cut sketch "Sketch11" along normal blind 5.25 contours A1 L4 L2 | L2 L4 A1
extrude "screwhole for thingy" cut sketch "Sketch18" along normal blind 41.75
ref_plane "Work Plane10" through (-182.7513, 87.2769, 166.4641) normal (0, 0.8660254, -0.5) x (1, 0, 0)
ref_plane "Work Plane9" through (-182.7513, 366.5701, 5.2141) normal (0, 0.8660254, -0.5) x (1, 0, 0)
sketch "Sketch20" plane through (-182.7513, 87.2769, 166.4641) normal (0, 0.8660254, -0.5) x (1, 0, 0)
  circle A0 centre (138, 200) radius 2.8284
  point P0 (182.7513, 187.8006)
ref_plane "Bottom of Airfoil" through (-204.525, 0, 16.5) normal (0, 0, 1) x (0, 1, 0)
sketch "Sketch21" plane through (-204.525, 0, 16.5) normal (0, 0, 1) x (0, 1, 0)
  line L0 (366.5707, -80.6294) -> (219.7127, -80.6294)
  line L1 (219.7127, -80.6294) -> (219.7127, -149.9934)
  line L2 (219.7127, -149.9934) -> (214.6627, -149.9934)
  line L3 (214.6627, -147.0779) -> (214.6627, -152.9089)
  line L4 (214.6627, -147.0779) -> (219.7125, -144.1624)
  line L5 (219.7125, -144.1624) -> (224.7623, -147.0779)
  line L6 (224.7623, -147.0779) -> (224.7623, -152.9089)
  line L7 (224.7623, -152.9089) -> (219.7125, -155.8244)
  line L8 (214.6627, -152.9089) -> (219.7125, -155.8244)
  point P0 (0, -204.525)
  point P1 (224.7623, -147.0779)
  dimension "d123" = 146.858
  dimension "d124" = 69.364
  dimension "d125" = 5.05
  dimension "d126" = 5.831
  dimension "d127" = 5.831
  dimension "d128" = 5.831
  dimension "d129" = 5.831
  dimension "d130" = 5.831
extrude "Hexagon Hole of Doom" cut sketch "Sketch21" against normal blind 4
sketch "Sketch22" plane through (-182.7513, 87.2769, 166.4641) normal (0, 0.8660254, -0.5) x (1, 0, 0)
  line L0 (138, 200) -> (153, 200)
  line L1 (153, 200) -> (153, 185)
  circle A0 centre (153, 185) radius 5.25
  line L2 (153, 185) -> (61.5, 185)
  circle A1 centre (61.5, 185) radius 5.25
  point P0 (182.7513, 187.8006)
  dimension "d137" = 15
  dimension "d138" = 15
  dimension "d139" = 10.5
  dimension "d140" = 91.5
  dimension "d141" = 10.5
extrude "Extrusion23" cut sketch "Sketch22" along normal blind 68.25
sketch "Sketch23" plane through (-182.7513, 87.2769, 166.4641) normal (0, 0.8660254, -0.5) x (1, 0, 0)
  line L0 (138, 200) -> (153, 200)
  line L1 (153, 200) -> (153, 185)
  line L2 (153, 185) -> (61.5, 185)
  circle A0 centre (153, 185) radius 5.25
  circle A1 centre (153, 185) radius 3.25
  circle A2 centre (61.5, 185) radius 5.25
  circle A3 centre (61.5, 185) radius 3.25
  point P0 (182.7513, 187.8006)
  dimension "d144" = 15
  dimension "d145" = 15
  dimension "d146" = 91.5
  dimension "d147" = 10.5
  dimension "d148" = 6.5
  dimension "d149" = 10.5
  dimension "d150" = 6.5
extrude "Extrusion24" add sketch "Sketch23" along normal blind 20 contours A0 L2 A1 L1 | L1 A1 L2 A0 | A2
sketch "Sketch24" plane through (0, 0, 0) normal (0, -1, 0) x (1, 0, 0)
  line L0 (0, -15) -> (-205, -15)
  line L1 (-205, -15) -> (-205, 16)
  line L2 (-205, 16) -> (0, 16)
  line L3 (0, 16) -> (0, -15)
  point P0 (0, 0)
extrude "Extrusion25" cut sketch "Sketch24" along normal blind 8.75
sketch "Sketch25" plane through (0, 226.7455, 0) normal (-1, 0, 0) x (0, 0, 1)
  line L0 (-16.4393, -226.7455) -> (20.5607, -226.7455) construction
  line L1 (17.0941, -211.1086) -> (17.0941, -226.7455)
  line L2 (17.0941, -226.7455) -> (-16.4393, -226.7455)
  line L3 (-16.4393, -226.7455) -> (36.2607, -226.7455) construction
  line L4 (-16.4393, -226.7455) -> (17.4356, -226.7455)
  line L5 (0, -226.7455) -> (0, -219.0797)
  line L6 (17.0941, -201.9506) -> (17.0941, -211.1086)
  line L7 (-36.0788, -226.7455) -> (-16.4393, -226.7455)
  line L8 (-6.752, -213.0525) -> (6.5452, -213.0525) construction
  line L9 (-6.752, -222.2282) -> (6.752, -215.9312)
  line L10 (6.752, -215.9312) -> (7.5873, -206.3837)
  line L11 (7.5873, -206.3837) -> (-14.6028, -216.7311)
  line L12 (-14.6028, -216.7311) -> (-6.752, -222.2282)
  line L13 (-16.4393, -226.7455) -> (17.0941, -211.1086)
  line L14 (17.0941, -226.7455) -> (-16.4393, -226.7455)
  line L15 (-16.4393, -226.7455) -> (-16.4393, 228)
  line L16 (-16.4393, 228) -> (17.0941, 228)
  line L17 (17.0941, 228) -> (17.0941, -226.7455)
  dimension "d155" = 37
  dimension "d220" = 14.9
  dimension "d221" = 60
  dimension "d222" = 60
  dimension "d223" = 8.3
ref_plane "Work Plane14" through (0, 366.491, 0) normal (0, 1, 0) x (1, 0, 0)
ref_plane "Work Plane15" through (-168.2987, 4.1455, -7.5873) normal (0, -0.9063078, 0.4226183) x (1, 0, 0)
extrude "Extrusion36" cut sketch "Sketch25" along normal blind 236.5 contours L13 L10 L11 L12 L15 L16 L17 L6 | L1 L2 L5 L9 L13 | L2 L13 L9 L5
sketch "Sketch35" plane through (-174.1935, 4.5173, -6.752) normal (0, -0.9063078, 0.4226183) x (1, 0, 0)
  line L0 (174.1935, 4.2103) -> (59.1935, 4.2103)
  line L1 (59.1935, 4.2103) -> (59.1935, 22)
  line L2 (59.1935, 22) -> (-35, 22)
  line L3 (-35, 22) -> (-35, -11)
  line L4 (-35, -11) -> (59.1935, -11)
  line L5 (59.1935, -11) -> (59.1935, 4.2103)
  dimension "d226" = 115
extrude "Extrusion37" cut sketch "Sketch35" against normal blind 236.5
ref_plane "Work Plane8" through (0, 0, 0) normal (0, -1, 0) x (1, 0, 0)
properties part number "connector"
